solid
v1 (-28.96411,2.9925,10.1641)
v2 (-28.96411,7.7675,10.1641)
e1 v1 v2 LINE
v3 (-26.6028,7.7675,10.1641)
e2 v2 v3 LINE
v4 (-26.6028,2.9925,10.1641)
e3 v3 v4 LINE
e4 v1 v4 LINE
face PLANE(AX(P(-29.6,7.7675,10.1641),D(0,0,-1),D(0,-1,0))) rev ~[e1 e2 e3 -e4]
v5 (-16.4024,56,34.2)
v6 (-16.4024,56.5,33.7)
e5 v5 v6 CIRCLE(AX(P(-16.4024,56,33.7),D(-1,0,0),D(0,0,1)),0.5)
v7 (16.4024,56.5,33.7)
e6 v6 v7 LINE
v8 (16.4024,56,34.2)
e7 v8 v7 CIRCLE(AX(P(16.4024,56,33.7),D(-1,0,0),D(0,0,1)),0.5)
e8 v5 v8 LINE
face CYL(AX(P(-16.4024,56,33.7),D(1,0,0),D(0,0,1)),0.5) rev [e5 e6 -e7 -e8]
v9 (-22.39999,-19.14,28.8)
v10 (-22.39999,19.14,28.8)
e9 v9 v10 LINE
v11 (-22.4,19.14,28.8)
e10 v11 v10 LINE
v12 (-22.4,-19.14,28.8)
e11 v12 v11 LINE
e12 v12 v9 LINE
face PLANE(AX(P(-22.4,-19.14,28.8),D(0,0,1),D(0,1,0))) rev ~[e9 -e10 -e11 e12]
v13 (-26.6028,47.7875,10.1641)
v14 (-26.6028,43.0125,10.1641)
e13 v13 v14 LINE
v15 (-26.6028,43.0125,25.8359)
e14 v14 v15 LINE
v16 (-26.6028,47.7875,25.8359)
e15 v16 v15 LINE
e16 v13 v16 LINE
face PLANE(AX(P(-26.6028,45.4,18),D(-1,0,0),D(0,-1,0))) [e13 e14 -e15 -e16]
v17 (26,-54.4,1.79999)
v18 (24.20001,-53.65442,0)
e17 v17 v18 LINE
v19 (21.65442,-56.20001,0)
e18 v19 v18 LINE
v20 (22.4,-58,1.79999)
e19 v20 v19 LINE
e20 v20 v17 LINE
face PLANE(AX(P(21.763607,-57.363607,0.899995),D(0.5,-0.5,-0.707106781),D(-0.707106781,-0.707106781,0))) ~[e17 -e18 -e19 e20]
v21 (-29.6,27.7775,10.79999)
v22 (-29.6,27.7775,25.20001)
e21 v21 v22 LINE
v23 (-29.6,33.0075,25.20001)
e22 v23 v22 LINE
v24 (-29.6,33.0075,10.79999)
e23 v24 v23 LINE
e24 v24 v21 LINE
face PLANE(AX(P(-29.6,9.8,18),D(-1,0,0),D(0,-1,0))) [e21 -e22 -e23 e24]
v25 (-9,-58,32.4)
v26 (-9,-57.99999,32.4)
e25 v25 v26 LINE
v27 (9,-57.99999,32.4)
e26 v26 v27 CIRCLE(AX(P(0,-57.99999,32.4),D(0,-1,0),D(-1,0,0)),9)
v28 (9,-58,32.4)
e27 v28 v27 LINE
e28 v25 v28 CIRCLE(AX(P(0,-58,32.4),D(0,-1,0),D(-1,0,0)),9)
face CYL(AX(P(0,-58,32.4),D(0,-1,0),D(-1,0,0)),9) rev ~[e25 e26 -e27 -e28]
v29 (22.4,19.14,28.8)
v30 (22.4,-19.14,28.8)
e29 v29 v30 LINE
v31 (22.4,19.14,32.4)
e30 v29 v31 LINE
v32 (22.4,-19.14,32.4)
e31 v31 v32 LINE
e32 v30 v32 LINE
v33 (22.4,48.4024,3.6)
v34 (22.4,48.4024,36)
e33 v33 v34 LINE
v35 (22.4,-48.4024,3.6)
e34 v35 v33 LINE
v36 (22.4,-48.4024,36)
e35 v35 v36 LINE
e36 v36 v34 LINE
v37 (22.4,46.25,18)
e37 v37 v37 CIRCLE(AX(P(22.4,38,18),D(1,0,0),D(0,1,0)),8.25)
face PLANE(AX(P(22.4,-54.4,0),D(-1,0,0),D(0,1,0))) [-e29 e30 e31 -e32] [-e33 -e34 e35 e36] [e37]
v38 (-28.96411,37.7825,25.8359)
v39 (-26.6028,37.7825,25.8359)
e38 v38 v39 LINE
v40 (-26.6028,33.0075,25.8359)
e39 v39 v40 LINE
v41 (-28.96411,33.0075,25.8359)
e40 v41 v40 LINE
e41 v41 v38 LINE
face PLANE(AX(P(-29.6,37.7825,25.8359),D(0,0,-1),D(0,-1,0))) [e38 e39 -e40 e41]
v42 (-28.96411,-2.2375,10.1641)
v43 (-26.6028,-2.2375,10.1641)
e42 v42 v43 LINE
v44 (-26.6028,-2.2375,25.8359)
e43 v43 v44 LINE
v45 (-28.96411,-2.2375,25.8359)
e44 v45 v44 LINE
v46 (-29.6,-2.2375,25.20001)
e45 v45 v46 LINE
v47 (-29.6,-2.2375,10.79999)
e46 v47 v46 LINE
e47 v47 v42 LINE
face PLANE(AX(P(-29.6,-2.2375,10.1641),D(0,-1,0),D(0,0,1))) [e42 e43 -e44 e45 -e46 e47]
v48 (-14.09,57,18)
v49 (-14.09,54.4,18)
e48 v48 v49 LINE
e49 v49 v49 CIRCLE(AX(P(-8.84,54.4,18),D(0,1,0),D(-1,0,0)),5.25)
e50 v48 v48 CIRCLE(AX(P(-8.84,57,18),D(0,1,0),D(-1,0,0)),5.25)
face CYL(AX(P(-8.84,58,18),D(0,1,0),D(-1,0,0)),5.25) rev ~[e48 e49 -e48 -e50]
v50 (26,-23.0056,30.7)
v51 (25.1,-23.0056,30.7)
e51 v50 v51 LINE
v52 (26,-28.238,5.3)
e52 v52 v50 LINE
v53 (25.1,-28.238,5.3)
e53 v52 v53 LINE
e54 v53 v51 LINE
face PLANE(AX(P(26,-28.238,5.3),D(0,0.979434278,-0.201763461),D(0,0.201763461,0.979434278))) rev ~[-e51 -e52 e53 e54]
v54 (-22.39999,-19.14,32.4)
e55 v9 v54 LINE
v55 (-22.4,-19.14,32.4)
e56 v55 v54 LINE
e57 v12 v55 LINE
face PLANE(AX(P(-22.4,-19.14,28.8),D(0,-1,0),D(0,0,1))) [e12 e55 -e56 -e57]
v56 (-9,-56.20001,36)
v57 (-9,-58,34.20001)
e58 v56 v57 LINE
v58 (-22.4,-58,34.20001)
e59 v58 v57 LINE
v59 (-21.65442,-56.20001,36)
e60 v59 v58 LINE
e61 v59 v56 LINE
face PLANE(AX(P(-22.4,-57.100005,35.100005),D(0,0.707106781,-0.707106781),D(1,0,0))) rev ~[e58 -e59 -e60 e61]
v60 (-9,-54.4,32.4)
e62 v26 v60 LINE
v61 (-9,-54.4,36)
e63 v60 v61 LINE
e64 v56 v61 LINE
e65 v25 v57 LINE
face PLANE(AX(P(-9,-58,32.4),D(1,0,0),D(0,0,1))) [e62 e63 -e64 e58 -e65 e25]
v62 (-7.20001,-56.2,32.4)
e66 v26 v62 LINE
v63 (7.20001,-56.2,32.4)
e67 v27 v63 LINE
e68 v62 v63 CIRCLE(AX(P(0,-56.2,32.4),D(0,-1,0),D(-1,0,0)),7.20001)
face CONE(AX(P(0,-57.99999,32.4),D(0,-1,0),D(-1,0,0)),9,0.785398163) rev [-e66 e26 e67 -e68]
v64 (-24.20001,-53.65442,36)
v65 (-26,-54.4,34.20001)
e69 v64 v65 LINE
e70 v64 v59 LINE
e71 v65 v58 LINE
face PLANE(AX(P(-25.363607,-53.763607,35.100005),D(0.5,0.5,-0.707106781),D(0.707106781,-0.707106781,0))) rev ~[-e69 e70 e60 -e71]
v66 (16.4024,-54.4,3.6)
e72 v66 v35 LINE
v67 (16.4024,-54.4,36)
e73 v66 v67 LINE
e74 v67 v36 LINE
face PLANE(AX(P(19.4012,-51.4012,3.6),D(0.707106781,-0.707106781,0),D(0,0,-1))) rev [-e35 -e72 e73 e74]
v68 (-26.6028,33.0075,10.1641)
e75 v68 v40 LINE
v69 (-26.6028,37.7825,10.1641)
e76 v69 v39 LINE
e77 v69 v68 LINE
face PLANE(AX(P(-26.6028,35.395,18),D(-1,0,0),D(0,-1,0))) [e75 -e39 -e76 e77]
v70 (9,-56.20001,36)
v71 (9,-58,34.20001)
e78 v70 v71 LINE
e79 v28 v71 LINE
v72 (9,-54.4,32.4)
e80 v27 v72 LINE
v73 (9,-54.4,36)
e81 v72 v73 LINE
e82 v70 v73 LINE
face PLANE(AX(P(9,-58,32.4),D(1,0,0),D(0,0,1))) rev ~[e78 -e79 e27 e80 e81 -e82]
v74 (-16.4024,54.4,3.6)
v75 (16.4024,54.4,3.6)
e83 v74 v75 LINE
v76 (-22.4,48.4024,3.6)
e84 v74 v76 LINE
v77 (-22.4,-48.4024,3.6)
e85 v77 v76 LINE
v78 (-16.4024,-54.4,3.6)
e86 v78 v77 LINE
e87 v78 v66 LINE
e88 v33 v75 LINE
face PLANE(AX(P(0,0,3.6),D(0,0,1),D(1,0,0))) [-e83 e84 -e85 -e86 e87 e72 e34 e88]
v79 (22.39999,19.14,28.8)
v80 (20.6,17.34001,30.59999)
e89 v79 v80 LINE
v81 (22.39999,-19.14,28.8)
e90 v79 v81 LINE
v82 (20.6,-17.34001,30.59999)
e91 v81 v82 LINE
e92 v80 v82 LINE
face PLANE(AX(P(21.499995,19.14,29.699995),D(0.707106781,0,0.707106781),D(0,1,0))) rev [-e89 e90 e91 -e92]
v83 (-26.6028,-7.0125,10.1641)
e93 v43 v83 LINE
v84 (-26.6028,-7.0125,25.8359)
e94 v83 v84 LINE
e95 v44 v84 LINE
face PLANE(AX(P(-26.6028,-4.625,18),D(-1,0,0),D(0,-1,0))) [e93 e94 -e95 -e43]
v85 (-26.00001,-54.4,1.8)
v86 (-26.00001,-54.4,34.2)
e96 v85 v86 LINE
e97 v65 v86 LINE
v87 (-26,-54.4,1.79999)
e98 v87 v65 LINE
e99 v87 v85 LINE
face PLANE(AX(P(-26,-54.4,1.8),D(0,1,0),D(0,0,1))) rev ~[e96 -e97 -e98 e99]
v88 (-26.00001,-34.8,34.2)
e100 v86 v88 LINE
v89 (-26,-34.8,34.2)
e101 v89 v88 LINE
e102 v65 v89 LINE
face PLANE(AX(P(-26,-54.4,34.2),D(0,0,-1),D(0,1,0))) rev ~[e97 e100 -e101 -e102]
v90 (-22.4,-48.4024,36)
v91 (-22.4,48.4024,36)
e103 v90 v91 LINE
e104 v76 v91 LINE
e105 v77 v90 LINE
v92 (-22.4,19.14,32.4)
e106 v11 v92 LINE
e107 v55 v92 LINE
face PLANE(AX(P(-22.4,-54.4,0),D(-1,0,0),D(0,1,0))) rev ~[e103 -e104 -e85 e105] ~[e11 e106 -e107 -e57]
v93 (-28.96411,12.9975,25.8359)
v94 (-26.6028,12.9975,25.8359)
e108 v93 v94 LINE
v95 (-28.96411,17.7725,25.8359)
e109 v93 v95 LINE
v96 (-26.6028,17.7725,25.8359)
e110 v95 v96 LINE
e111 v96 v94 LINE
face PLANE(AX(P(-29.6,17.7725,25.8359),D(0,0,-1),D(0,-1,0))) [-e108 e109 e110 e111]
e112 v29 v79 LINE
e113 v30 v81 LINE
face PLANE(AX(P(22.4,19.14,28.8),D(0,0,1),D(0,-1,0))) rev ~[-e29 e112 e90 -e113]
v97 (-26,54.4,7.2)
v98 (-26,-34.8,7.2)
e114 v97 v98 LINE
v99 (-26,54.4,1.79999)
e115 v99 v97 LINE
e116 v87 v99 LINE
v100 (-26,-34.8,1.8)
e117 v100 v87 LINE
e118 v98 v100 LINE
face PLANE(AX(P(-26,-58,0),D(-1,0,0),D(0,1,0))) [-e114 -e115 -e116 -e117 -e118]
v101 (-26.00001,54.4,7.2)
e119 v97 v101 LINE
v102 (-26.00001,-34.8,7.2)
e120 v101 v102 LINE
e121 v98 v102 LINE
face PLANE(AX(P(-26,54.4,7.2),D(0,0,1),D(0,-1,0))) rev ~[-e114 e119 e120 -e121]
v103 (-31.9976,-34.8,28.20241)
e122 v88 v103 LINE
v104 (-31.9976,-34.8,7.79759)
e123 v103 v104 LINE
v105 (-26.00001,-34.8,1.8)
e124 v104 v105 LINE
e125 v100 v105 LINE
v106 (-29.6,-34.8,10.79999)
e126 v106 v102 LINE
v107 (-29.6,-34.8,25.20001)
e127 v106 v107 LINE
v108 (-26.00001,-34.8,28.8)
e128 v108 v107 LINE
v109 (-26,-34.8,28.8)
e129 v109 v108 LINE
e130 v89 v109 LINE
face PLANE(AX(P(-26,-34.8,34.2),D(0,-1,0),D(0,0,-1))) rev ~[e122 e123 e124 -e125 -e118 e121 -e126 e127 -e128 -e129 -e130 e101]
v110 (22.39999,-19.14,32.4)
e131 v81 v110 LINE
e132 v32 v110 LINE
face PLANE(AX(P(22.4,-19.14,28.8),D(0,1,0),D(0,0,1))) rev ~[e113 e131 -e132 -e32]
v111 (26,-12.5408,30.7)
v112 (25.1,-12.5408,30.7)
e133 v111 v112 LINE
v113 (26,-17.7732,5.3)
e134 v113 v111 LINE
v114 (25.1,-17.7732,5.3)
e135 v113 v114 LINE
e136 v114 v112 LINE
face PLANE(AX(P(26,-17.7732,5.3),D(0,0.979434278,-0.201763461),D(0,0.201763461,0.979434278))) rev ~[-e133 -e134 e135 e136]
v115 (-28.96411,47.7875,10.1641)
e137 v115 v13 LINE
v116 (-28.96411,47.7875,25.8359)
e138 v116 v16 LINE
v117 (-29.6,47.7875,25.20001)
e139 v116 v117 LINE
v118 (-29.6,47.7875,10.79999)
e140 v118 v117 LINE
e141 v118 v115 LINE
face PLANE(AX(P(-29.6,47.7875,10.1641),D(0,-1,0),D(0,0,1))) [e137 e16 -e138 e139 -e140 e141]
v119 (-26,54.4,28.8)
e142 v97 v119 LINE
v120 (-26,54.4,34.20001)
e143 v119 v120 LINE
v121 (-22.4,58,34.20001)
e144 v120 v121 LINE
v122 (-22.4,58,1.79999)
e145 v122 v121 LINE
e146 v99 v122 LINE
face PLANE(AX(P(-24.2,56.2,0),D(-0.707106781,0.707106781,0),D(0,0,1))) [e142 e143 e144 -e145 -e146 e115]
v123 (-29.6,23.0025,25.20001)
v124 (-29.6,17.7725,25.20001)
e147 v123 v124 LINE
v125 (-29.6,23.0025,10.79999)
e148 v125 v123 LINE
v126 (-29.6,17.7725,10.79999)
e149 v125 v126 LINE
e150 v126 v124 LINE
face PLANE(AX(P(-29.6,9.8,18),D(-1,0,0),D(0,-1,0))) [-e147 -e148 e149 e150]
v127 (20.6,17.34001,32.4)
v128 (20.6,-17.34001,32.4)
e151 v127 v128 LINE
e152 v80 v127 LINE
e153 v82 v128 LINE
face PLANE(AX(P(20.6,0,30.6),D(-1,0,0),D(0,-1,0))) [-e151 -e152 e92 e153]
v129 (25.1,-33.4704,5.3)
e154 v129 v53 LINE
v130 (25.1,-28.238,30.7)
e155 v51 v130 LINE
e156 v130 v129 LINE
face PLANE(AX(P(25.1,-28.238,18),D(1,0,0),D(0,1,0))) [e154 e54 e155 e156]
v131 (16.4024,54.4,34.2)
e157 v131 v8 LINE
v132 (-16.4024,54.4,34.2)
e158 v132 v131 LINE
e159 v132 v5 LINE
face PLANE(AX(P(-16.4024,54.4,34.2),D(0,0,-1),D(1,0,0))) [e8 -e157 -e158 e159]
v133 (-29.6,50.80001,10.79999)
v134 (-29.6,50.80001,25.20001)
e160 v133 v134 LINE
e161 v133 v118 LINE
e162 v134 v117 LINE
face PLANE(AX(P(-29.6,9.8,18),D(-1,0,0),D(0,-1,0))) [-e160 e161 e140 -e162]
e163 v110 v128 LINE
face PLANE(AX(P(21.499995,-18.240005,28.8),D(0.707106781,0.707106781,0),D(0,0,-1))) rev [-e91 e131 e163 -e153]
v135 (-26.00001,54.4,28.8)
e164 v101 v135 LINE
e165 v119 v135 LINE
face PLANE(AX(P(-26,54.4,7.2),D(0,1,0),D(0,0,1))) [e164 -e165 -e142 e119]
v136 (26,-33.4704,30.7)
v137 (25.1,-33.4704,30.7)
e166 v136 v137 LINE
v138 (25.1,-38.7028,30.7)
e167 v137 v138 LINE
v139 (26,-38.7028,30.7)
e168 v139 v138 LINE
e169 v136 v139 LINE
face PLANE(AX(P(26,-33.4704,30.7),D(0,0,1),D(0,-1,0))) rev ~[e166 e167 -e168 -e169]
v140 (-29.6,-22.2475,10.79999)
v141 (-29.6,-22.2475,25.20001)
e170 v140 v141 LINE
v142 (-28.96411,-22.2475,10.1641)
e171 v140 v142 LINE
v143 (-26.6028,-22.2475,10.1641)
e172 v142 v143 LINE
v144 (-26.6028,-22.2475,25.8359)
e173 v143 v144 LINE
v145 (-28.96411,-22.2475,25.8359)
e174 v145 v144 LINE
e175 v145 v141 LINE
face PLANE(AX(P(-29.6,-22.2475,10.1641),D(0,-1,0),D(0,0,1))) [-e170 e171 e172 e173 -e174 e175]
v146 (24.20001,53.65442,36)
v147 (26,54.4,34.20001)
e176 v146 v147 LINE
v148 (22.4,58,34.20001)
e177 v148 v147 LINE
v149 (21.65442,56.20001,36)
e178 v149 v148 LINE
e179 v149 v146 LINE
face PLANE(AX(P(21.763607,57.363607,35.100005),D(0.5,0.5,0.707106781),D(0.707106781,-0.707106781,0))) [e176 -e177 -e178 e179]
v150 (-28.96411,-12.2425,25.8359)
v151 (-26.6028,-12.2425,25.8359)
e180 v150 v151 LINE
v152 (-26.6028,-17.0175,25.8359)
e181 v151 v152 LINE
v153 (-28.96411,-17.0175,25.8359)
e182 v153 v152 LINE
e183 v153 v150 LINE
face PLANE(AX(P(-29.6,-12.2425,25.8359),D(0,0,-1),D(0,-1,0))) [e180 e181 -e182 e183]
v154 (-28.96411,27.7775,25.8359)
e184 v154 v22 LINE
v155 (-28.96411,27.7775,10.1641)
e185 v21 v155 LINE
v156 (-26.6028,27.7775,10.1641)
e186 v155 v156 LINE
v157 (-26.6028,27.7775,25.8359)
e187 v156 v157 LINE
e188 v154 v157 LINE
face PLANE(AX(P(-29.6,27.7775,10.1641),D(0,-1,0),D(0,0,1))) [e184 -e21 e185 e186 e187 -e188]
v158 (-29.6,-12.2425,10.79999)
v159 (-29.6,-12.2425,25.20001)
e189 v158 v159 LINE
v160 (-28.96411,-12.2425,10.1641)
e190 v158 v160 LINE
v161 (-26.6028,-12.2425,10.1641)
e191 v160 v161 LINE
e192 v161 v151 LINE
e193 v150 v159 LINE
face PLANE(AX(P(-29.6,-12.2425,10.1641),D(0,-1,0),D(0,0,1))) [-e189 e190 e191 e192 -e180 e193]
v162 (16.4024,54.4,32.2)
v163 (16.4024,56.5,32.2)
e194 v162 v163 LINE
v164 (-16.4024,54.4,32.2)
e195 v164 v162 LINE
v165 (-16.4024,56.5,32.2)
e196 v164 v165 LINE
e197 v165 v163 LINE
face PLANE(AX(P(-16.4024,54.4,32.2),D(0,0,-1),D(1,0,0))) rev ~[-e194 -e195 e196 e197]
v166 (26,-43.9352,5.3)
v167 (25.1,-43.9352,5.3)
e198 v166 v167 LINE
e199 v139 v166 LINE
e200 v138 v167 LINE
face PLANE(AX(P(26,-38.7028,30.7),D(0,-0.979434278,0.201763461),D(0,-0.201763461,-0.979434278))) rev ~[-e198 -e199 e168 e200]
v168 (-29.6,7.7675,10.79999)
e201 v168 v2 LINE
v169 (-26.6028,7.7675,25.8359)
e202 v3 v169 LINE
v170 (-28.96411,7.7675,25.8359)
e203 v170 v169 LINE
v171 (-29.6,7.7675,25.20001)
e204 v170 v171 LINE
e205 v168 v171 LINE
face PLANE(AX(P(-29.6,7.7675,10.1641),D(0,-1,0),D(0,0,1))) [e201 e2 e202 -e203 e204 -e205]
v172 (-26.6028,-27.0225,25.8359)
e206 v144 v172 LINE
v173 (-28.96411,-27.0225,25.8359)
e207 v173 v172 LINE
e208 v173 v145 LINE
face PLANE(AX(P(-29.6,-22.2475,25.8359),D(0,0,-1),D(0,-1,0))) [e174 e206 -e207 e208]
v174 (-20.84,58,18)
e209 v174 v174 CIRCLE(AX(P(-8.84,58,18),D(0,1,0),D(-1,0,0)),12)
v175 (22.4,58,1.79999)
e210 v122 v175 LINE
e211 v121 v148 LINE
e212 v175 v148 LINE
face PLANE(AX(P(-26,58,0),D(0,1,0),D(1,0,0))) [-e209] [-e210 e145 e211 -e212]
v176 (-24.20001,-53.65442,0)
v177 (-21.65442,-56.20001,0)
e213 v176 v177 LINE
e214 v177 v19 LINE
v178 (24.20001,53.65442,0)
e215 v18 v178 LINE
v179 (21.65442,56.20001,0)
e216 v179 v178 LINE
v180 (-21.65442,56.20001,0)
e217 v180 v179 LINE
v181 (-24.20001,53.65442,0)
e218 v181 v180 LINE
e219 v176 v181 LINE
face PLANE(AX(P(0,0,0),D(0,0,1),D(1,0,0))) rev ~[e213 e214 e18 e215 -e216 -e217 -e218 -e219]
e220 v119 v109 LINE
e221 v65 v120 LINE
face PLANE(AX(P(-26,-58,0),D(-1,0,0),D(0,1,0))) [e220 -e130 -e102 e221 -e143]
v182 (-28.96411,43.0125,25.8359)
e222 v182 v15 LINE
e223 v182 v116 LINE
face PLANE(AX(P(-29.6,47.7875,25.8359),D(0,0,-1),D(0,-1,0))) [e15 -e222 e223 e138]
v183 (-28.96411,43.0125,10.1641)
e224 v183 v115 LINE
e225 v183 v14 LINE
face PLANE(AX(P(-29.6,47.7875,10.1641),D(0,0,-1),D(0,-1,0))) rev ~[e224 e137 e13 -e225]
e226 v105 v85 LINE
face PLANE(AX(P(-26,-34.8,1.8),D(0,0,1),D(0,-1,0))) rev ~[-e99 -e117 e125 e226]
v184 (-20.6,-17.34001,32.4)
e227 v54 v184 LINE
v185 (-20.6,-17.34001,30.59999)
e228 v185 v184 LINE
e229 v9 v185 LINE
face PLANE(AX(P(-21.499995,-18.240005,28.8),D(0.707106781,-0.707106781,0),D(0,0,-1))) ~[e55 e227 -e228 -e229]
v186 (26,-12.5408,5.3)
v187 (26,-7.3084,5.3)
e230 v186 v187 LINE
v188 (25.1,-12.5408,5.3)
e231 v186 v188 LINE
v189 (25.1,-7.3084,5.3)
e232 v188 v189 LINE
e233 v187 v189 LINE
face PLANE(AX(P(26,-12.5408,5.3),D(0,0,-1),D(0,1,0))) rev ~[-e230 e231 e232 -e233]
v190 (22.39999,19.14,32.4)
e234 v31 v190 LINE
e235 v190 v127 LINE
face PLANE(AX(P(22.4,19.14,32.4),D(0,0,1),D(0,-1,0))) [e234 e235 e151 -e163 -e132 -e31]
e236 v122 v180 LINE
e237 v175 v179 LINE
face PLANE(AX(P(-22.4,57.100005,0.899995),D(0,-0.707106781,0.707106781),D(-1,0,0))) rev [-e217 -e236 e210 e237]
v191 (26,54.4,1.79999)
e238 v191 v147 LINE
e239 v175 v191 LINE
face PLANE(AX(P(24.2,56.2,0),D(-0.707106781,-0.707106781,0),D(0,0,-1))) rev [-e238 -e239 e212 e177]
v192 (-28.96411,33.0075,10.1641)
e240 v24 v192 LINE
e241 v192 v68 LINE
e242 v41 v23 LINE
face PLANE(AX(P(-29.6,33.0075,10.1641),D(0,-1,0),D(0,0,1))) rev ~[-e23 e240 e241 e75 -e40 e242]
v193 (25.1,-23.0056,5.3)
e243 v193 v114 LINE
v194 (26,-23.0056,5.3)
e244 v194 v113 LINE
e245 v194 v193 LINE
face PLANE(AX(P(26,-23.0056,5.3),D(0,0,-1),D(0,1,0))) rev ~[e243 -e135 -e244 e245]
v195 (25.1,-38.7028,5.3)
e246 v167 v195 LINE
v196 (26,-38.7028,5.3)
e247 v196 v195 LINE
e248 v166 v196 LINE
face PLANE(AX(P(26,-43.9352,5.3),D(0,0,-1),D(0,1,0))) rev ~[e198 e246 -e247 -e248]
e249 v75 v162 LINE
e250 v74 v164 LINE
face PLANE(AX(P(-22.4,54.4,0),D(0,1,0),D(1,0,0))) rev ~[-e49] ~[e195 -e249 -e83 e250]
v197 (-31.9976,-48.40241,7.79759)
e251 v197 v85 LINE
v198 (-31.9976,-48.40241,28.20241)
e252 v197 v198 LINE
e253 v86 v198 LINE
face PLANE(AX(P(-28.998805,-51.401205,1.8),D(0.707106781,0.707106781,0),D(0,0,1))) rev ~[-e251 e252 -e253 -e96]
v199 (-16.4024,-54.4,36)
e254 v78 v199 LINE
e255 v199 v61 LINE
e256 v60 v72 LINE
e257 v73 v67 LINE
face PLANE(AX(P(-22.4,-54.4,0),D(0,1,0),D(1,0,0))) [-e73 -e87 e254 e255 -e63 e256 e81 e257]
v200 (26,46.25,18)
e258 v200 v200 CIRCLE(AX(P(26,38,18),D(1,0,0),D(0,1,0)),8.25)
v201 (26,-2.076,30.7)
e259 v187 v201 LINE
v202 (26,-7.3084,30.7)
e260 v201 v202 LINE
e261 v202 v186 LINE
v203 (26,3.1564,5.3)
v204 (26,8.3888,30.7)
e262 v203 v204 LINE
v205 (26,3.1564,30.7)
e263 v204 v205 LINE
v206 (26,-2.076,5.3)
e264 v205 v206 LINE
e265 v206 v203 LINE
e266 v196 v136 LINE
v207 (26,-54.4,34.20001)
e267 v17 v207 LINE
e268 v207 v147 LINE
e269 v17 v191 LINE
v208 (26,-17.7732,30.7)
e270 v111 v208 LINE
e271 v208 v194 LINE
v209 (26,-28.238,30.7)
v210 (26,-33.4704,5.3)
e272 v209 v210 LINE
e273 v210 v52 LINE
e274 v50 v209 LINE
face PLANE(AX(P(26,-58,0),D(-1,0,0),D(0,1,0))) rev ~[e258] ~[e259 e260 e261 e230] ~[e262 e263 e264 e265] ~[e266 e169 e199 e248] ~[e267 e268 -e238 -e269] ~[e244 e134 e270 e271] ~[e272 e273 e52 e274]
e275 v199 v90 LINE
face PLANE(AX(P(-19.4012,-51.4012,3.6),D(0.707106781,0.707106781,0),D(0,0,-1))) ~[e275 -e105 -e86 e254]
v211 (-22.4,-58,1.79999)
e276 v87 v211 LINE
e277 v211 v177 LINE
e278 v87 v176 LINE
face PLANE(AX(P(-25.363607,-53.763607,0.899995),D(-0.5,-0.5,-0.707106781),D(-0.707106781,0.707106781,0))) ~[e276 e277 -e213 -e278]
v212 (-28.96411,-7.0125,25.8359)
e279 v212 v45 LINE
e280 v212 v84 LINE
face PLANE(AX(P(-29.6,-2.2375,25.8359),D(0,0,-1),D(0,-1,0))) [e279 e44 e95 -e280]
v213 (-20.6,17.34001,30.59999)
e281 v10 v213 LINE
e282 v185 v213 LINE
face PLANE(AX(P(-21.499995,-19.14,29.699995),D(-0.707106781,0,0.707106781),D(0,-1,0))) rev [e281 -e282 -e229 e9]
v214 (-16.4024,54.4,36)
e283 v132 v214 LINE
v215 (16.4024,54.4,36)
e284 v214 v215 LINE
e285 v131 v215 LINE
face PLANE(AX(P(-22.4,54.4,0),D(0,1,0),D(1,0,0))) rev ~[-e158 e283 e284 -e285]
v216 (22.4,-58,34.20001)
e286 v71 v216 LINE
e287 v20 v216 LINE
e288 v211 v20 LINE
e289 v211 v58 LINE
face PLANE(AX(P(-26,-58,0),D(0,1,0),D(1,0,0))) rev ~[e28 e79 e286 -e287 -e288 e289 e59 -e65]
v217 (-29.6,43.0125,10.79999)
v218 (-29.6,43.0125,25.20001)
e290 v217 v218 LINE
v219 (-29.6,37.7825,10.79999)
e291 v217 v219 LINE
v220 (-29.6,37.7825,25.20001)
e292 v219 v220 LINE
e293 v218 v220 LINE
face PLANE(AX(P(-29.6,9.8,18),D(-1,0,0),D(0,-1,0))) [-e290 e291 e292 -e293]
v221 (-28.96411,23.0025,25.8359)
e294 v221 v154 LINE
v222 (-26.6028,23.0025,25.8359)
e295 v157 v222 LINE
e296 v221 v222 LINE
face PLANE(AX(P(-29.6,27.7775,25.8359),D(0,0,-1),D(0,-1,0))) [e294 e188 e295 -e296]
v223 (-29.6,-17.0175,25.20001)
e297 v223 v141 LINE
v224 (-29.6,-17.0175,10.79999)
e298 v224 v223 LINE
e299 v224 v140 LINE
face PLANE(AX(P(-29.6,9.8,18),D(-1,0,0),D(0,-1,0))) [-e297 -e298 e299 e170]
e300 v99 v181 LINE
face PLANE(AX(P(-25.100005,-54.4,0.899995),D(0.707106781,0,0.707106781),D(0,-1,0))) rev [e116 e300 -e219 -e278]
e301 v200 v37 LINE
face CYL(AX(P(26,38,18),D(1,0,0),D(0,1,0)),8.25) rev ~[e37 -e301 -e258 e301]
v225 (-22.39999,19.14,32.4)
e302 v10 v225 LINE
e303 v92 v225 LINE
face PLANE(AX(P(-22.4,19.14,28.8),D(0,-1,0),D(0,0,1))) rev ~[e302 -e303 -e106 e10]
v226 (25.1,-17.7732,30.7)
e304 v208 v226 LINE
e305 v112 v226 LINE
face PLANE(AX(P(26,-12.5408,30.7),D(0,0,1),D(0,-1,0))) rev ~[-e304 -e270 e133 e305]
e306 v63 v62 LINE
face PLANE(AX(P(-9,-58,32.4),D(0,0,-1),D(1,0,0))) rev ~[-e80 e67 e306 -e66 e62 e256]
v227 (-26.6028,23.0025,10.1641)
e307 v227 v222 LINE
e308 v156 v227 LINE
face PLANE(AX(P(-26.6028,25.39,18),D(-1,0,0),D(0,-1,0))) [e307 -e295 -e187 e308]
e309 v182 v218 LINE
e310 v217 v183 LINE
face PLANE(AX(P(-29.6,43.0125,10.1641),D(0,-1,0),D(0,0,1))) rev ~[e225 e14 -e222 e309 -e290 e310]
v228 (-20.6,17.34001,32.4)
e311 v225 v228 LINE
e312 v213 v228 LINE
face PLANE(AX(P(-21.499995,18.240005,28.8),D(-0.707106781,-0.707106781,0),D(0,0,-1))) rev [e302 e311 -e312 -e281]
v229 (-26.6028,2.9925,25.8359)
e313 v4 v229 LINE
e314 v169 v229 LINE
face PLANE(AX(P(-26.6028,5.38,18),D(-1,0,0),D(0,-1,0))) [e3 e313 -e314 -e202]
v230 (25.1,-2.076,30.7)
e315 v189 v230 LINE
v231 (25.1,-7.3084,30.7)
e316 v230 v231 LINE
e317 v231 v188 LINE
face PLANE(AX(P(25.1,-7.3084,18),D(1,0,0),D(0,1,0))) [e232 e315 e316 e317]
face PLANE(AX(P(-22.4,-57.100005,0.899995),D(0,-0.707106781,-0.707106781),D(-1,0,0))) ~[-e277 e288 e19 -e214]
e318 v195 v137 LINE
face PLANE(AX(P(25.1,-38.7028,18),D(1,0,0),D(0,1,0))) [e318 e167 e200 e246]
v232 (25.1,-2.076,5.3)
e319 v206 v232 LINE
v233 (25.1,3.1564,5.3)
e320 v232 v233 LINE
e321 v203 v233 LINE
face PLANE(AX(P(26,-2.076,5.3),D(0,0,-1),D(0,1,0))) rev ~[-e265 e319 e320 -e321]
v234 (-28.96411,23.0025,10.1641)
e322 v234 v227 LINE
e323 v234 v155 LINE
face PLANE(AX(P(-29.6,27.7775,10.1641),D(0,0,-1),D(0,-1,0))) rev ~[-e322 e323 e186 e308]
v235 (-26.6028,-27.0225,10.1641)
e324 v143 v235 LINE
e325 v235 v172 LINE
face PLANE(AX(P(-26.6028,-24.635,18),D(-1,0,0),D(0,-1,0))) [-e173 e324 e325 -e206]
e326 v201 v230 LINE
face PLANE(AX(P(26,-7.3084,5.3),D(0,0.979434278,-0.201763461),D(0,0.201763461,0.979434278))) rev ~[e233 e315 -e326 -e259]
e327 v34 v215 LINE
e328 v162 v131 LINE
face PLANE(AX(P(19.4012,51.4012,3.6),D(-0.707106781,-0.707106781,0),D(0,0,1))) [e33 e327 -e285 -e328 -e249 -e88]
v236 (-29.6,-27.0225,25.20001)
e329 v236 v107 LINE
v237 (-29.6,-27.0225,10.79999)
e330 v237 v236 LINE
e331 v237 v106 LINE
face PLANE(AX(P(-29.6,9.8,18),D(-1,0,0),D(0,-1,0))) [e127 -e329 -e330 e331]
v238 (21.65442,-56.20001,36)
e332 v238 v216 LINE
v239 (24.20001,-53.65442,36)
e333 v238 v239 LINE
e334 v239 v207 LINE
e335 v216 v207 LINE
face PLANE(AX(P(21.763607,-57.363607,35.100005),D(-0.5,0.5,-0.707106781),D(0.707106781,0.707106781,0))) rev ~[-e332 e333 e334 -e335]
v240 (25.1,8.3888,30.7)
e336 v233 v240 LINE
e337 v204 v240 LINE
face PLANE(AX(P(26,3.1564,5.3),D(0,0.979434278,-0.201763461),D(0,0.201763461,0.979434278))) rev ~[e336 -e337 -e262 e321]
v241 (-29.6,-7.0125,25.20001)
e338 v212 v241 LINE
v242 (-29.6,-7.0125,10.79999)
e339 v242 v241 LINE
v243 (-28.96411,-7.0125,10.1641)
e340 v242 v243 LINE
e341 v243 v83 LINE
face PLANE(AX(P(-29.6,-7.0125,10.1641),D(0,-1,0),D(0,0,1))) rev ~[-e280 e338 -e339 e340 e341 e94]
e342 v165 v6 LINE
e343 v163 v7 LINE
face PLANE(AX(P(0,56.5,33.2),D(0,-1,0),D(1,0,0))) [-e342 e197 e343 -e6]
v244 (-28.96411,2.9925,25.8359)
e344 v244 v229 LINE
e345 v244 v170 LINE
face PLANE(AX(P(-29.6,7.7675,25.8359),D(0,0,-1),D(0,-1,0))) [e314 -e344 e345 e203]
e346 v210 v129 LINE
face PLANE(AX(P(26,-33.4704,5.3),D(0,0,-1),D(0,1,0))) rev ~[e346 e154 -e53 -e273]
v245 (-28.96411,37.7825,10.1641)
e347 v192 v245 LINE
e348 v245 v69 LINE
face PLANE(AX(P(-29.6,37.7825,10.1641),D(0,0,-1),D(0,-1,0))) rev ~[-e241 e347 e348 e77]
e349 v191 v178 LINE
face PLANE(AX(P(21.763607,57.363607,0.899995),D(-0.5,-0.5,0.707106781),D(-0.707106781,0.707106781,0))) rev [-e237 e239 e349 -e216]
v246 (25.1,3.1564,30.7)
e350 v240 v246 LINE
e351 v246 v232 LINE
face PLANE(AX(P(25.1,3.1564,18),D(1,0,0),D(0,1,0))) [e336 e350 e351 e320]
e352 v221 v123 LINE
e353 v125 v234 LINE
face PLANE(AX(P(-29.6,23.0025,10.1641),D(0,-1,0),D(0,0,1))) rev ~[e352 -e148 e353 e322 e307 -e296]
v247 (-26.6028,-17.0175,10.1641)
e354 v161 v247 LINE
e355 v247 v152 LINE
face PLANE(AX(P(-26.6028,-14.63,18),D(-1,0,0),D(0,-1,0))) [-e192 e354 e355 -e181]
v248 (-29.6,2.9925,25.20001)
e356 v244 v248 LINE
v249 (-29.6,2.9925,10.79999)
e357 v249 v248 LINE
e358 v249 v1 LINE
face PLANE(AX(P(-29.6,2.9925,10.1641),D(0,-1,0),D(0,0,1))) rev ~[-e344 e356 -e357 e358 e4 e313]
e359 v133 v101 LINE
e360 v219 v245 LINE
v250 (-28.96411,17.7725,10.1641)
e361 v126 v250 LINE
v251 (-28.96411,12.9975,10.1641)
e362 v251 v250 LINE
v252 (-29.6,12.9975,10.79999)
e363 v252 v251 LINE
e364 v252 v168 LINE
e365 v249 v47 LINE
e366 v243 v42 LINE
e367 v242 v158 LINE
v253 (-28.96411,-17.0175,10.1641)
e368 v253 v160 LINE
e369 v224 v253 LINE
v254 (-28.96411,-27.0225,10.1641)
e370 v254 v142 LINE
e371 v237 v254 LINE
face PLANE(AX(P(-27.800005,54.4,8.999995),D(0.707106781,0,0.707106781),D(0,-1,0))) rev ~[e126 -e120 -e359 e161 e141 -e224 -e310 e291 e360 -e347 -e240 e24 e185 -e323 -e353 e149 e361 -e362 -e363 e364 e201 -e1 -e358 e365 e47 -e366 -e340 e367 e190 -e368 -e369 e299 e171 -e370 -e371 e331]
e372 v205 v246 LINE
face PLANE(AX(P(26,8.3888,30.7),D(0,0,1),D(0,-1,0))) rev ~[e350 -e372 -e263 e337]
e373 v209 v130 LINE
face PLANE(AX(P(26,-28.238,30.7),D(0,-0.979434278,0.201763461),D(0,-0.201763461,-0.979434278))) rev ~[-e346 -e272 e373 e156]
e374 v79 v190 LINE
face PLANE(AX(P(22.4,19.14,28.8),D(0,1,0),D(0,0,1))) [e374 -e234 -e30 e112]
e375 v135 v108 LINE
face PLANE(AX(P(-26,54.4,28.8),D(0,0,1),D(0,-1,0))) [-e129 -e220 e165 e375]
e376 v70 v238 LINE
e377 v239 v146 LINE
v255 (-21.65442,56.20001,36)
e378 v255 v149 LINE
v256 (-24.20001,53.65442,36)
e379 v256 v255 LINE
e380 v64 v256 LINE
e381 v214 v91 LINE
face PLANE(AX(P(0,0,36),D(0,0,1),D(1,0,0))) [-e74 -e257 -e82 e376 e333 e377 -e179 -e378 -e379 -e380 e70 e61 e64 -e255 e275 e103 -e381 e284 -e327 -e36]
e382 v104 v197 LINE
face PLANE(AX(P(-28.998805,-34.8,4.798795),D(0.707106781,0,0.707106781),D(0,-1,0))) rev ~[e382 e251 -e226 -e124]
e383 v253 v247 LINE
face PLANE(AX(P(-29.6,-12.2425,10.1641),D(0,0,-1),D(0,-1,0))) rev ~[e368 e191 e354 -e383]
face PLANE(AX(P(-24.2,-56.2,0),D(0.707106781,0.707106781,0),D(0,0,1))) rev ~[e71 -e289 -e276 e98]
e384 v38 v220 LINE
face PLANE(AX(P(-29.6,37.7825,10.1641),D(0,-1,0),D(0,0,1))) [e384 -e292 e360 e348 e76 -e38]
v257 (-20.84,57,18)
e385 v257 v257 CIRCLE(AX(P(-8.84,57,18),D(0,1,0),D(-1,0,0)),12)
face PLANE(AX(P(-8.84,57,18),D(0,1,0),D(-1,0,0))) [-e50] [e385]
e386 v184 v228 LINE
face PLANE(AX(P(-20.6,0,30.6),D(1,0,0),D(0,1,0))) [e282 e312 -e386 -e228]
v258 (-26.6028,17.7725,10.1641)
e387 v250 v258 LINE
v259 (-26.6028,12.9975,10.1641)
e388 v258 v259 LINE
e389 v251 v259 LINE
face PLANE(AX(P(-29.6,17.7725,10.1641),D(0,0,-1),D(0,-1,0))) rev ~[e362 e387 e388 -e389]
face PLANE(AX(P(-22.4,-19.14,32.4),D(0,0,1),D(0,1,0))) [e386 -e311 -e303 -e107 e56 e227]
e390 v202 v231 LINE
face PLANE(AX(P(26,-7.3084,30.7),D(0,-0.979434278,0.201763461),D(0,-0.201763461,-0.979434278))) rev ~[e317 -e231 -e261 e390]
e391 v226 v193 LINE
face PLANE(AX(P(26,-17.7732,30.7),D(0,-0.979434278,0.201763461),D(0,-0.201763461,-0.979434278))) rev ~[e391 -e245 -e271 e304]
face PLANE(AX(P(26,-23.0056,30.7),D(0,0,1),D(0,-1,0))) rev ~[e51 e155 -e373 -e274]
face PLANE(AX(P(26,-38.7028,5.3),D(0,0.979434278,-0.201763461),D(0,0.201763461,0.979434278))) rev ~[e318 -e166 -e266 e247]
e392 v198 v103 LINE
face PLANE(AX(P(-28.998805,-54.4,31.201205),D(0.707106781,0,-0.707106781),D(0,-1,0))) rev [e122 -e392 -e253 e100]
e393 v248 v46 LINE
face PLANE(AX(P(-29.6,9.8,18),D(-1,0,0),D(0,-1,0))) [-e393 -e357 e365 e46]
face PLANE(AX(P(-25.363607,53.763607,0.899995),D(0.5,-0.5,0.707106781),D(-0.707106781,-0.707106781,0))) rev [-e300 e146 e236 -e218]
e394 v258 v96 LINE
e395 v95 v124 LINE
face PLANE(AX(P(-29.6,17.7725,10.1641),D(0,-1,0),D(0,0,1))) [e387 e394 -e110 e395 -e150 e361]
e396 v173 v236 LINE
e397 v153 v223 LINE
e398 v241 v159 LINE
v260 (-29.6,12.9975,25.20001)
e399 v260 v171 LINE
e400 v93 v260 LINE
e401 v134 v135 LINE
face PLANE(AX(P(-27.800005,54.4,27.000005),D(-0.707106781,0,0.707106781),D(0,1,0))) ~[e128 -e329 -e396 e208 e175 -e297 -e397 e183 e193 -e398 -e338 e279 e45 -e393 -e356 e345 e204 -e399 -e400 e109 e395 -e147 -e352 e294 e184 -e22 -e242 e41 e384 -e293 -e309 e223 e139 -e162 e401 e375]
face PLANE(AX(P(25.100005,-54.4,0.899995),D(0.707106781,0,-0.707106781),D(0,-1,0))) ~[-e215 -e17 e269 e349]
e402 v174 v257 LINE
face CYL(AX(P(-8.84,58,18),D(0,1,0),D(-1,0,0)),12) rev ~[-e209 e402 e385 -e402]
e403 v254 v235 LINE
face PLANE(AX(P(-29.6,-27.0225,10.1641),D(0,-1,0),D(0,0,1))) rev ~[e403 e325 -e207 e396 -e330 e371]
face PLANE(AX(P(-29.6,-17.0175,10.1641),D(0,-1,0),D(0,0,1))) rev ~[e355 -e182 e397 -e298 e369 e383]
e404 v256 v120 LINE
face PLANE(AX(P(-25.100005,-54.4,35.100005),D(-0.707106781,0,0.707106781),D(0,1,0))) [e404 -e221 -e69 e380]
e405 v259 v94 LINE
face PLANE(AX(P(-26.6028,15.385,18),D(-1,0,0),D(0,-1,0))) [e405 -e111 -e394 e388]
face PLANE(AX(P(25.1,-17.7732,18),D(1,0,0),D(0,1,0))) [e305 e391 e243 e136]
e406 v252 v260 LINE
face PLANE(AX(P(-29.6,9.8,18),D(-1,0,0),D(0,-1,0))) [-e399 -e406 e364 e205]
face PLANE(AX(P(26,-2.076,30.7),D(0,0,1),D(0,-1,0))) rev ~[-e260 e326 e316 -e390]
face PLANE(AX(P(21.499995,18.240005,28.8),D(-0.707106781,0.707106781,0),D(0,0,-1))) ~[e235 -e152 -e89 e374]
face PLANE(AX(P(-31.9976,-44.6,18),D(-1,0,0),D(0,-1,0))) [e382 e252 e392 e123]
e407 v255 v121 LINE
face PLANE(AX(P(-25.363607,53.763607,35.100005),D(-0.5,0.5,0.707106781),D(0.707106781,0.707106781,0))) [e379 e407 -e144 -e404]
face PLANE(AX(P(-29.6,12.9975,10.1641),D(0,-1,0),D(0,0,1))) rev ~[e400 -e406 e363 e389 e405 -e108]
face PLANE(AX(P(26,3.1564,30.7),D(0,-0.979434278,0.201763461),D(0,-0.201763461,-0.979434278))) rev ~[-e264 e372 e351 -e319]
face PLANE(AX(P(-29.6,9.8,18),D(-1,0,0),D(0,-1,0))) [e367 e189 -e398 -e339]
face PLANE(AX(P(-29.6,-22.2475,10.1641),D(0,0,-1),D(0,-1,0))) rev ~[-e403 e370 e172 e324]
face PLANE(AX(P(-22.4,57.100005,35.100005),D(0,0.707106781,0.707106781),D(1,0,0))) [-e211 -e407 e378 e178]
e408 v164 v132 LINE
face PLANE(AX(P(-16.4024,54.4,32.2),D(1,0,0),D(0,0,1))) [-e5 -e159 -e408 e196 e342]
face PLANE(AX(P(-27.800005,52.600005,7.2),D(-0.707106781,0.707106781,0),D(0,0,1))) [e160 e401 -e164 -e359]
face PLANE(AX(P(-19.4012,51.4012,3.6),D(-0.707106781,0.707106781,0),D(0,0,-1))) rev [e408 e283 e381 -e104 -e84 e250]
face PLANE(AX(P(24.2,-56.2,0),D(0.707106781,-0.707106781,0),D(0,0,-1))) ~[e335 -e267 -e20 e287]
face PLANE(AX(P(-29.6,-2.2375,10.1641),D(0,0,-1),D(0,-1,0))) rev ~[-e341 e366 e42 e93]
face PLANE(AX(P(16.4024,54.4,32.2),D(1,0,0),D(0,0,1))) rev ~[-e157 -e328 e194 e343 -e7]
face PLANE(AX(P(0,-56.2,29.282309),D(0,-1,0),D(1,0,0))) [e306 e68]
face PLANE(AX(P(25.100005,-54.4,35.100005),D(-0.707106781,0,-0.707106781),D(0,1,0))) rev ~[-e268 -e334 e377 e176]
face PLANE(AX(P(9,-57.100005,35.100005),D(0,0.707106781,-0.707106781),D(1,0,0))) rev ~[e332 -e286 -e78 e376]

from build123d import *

# Parameters (mm, degrees)
F2_W      = 52
F2_H      = 116
F2_W_2    = 44.8
F2_H_2    = 108.8
F3_DEPTH  = 36
F4_DEPTH  = 3.6
F7_SIZE   = 3.6
F8_SIZE   = 5.9976
F6_R      = 5.25
F9_DEPTH  = 3.6
F5_R      = 8.25
F10_DEPTH = 3.6
F11_W     = 18
F11_H     = 3.6
F12_DEPTH = 3.6
F13_W     = 32.8048
F13_H     = 2
F14_DEPTH = 2.1
F6_R_2    = 12
F15_DEPTH = 1
F16_R     = 0.5
F17_W     = 38.28
F17_H     = 3.6
F19_DEPTH = 1.8
F18_W     = 38.28
F18_H     = 3.6
F20_DEPTH = 1.8
F21_SIZE  = 1.79999
F23_DEPTH = 1.8
F24_SIZE  = 1.79999
F26_W     = 89.2
F26_H     = 21.6
F27_DEPTH = 3.6
F28_DEPTH = 5.9976
F30_SIZE  = 3.59999
F29_W     = 4.775
F29_H     = 15.6718
F31_DEPTH = 2.9972
F32_SIZE  = 5.99759
F34_DEPTH = 0.9


# Not quite as in the source:
# - two fillets or chamfers of one size are made in one step
# - a fillet or chamfer is up to 0.001 mm smaller than in the source, because OpenCascade refuses the exact size


with BuildPart() as f3:
    # F2 (on Top) → F3 (new body)
    with BuildSketch(Plane.XY):
        Rectangle(F2_W, F2_H)
        Rectangle(F2_W_2, F2_H_2, mode=Mode.SUBTRACT)
    extrude(amount=F3_DEPTH)

    # F2 (on Top) → F4 (join)
    with BuildSketch(Plane.XY):
        Rectangle(F2_W_2, F2_H_2)
    extrude(amount=F4_DEPTH)

    # F7
    f7_edges = [f3.edges().sort_by_distance(p)[0] for p in [
        (-26, -58, 18),
        (26, -58, 18),
        (26, 58, 18),
        (-26, 58, 18),
    ]]
    chamfer(f7_edges, length=F7_SIZE)

    # F8
    f8_edges = [f3.edges().sort_by_distance(p)[0] for p in [
        (-22.4, 54.4, 19.8),
        (22.4, 54.4, 19.8),
        (-22.4, -54.4, 19.8),
        (22.4, -54.4, 19.8),
    ]]
    chamfer(f8_edges, length=F8_SIZE)

    # F6 (on face) → F9 (cut)
    with BuildSketch(Plane(origin=(0, 58, 0), x_dir=(-1, 0, 0), z_dir=(0, 1, 0))):
        with Locations((8.84, 18)):
            Circle(F6_R)
    extrude(amount=-F9_DEPTH, mode=Mode.SUBTRACT)

    # F5 (on face) → F10 (cut)
    with BuildSketch(Plane.YZ.offset(26)):
        with Locations((38, 18)):
            Circle(F5_R)
    extrude(amount=-F10_DEPTH, mode=Mode.SUBTRACT)

    # F11 (on face) → F12 (cut)
    with BuildSketch(Plane.XZ.offset(58)):
        with Locations((0, 34.2)):
            Rectangle(F11_W, F11_H)
    extrude(amount=-F12_DEPTH, mode=Mode.SUBTRACT)

    # F13 (on face) → F14 (cut)
    with BuildSketch(Plane.XZ.offset(-54.4)):
        with Locations((0, 33.2)):
            Rectangle(F13_W, F13_H)
    extrude(amount=-F14_DEPTH, mode=Mode.SUBTRACT)

    # F6 (on face) → F15 (cut)
    with BuildSketch(Plane(origin=(0, 58, 0), x_dir=(-1, 0, 0), z_dir=(0, 1, 0))):
        with Locations((8.84, 18)):
            Circle(F6_R_2)
        with Locations((8.84, 18)):
            Circle(F6_R, mode=Mode.SUBTRACT)
    extrude(amount=-F15_DEPTH, mode=Mode.SUBTRACT)

    # F16
    f16_edges = [f3.edges().sort_by_distance(p)[0] for p in [
        (0, 56.5, 34.2),
    ]]
    fillet(f16_edges, radius=F16_R)

    # F17 (on face) → F19 (join)
    with BuildSketch(Plane(origin=(22.4, 0, 0), x_dir=(0, -1, 0), z_dir=(-1, 0, 0))):
        with Locations((0, 30.6)):
            Rectangle(F17_W, F17_H)
    extrude(amount=F19_DEPTH)

    # F18 (on face) → F20 (join)
    with BuildSketch(Plane.YZ.offset(-22.4)):
        with Locations((0, 30.6)):
            Rectangle(F18_W, F18_H)
    extrude(amount=F20_DEPTH)

    # F21 (size 1.8 in the source; OpenCascade refuses exactly that, so slightly less here)
    f21_edges = [f3.edges().sort_by_distance(p)[0] for p in [
        (-20.6, -19.14, 30.6),
        (-20.6, 0, 28.8),
        (-20.6, 19.14, 30.6),
        (20.6, 19.14, 30.6),
        (20.6, 0, 28.8),
        (20.6, -19.14, 30.6),
        (-15.7, -58, 36),
        (-24.2, -56.2, 36),
        (-26, 0, 36),
        (-24.2, 56.2, 36),
        (0, 58, 36),
        (24.2, 56.2, 36),
        (26, 0, 36),
        (24.2, -56.2, 36),
        (15.7, -58, 36),
        (0, -58, 0),
        (-24.2, -56.2, 0),
        (-26, 0, 0),
        (-24.2, 56.2, 0),
        (0, 58, 0),
        (24.2, 56.2, 0),
        (26, 0, 0),
        (24.2, -56.2, 0),
    ]]
    chamfer(f21_edges, length=F21_SIZE)

    # F11 (on face) → F23 (cut)
    with BuildSketch(Plane.XZ.offset(58)):
        with BuildLine():
            ThreePointArc((-9, 32.4), (0, 23.4), (9, 32.4))
            Line((9, 32.4), (-9, 32.4))
        make_face()
    extrude(amount=-F23_DEPTH, mode=Mode.SUBTRACT)

    # F24 (size 1.8 in the source; OpenCascade refuses exactly that, so slightly less here)
    f24_edges = [f3.edges().sort_by_distance(p)[0] for p in [
        (0, -56.2, 23.4),
    ]]
    chamfer(f24_edges, length=F24_SIZE)

    # F26 (on face) → F27 (join)
    with BuildSketch(Plane(origin=(-26, 0, 0), x_dir=(0, -1, 0), z_dir=(-1, 0, 0))):
        with Locations((-9.8, 18)):
            Rectangle(F26_W, F26_H)
    extrude(amount=F27_DEPTH)

    # F26 (on face) → F28 (join)
    with BuildSketch(Plane(origin=(-26, 0, 0), x_dir=(0, -1, 0), z_dir=(-1, 0, 0))):
        Polygon((54.4, 1.8), (54.4, 34.2), (34.8, 34.2), (34.8, 28.8), (34.8, 7.2), (34.8, 1.8), align=None)
    extrude(amount=F28_DEPTH)

    # F30 (size 3.6 in the source; OpenCascade refuses exactly that, so slightly less here)
    f30_edges = [f3.edges().sort_by_distance(p)[0] for p in [
        (-29.6, 54.4, 18),
        (-29.6, 9.8, 7.2),
        (-29.6, 9.8, 28.8),
    ]]
    chamfer(f30_edges, length=F30_SIZE)

    # F29 (on face) → F31 (cut)
    with BuildSketch(Plane(origin=(-29.6, 0, 0), x_dir=(0, -1, 0), z_dir=(-1, 0, 0))):
        with Locations((-45.4, 18)):
            Rectangle(F29_W, F29_H)
        with Locations((-35.395, 18)):
            Rectangle(F29_W, F29_H)
        with Locations((-25.39, 18)):
            Rectangle(F29_W, F29_H)
        with Locations((-15.385, 18)):
            Rectangle(F29_W, F29_H)
        with Locations((-5.38, 18)):
            Rectangle(F29_W, F29_H)
        with Locations((4.625, 18)):
            Rectangle(F29_W, F29_H)
        with Locations((14.63, 18)):
            Rectangle(F29_W, F29_H)
        with Locations((24.635, 18)):
            Rectangle(F29_W, F29_H)
    extrude(amount=-F31_DEPTH, mode=Mode.SUBTRACT)

    # F32 (size 5.9976 in the source; OpenCascade refuses exactly that, so slightly less here)
    f32_edges = [f3.edges().sort_by_distance(p)[0] for p in [
        (-31.9976, -44.6, 34.2),
        (-31.9976, -54.4, 18),
        (-31.9976, -44.6, 1.8),
    ]]
    chamfer(f32_edges, length=F32_SIZE)

    # F33 (on face) → F34 (cut)
    with BuildSketch(Plane.YZ.offset(26)):
        Polygon((-33.4704, 30.7), (-38.7028, 30.7), (-43.9352, 5.3), (-38.7028, 5.3), align=None)
        Polygon((-23.0056, 30.7), (-28.238, 30.7), (-33.4704, 5.3), (-28.238, 5.3), align=None)
        Polygon((-12.5408, 30.7), (-17.7732, 30.7), (-23.0056, 5.3), (-17.7732, 5.3), align=None)
        Polygon((-2.076, 30.7), (-7.3084, 30.7), (-12.5408, 5.3), (-7.3084, 5.3), align=None)
        Polygon((8.3888, 30.7), (3.1564, 30.7), (-2.076, 5.3), (3.1564, 5.3), align=None)
    extrude(amount=-F34_DEPTH, mode=Mode.SUBTRACT)


solid = f3.part
